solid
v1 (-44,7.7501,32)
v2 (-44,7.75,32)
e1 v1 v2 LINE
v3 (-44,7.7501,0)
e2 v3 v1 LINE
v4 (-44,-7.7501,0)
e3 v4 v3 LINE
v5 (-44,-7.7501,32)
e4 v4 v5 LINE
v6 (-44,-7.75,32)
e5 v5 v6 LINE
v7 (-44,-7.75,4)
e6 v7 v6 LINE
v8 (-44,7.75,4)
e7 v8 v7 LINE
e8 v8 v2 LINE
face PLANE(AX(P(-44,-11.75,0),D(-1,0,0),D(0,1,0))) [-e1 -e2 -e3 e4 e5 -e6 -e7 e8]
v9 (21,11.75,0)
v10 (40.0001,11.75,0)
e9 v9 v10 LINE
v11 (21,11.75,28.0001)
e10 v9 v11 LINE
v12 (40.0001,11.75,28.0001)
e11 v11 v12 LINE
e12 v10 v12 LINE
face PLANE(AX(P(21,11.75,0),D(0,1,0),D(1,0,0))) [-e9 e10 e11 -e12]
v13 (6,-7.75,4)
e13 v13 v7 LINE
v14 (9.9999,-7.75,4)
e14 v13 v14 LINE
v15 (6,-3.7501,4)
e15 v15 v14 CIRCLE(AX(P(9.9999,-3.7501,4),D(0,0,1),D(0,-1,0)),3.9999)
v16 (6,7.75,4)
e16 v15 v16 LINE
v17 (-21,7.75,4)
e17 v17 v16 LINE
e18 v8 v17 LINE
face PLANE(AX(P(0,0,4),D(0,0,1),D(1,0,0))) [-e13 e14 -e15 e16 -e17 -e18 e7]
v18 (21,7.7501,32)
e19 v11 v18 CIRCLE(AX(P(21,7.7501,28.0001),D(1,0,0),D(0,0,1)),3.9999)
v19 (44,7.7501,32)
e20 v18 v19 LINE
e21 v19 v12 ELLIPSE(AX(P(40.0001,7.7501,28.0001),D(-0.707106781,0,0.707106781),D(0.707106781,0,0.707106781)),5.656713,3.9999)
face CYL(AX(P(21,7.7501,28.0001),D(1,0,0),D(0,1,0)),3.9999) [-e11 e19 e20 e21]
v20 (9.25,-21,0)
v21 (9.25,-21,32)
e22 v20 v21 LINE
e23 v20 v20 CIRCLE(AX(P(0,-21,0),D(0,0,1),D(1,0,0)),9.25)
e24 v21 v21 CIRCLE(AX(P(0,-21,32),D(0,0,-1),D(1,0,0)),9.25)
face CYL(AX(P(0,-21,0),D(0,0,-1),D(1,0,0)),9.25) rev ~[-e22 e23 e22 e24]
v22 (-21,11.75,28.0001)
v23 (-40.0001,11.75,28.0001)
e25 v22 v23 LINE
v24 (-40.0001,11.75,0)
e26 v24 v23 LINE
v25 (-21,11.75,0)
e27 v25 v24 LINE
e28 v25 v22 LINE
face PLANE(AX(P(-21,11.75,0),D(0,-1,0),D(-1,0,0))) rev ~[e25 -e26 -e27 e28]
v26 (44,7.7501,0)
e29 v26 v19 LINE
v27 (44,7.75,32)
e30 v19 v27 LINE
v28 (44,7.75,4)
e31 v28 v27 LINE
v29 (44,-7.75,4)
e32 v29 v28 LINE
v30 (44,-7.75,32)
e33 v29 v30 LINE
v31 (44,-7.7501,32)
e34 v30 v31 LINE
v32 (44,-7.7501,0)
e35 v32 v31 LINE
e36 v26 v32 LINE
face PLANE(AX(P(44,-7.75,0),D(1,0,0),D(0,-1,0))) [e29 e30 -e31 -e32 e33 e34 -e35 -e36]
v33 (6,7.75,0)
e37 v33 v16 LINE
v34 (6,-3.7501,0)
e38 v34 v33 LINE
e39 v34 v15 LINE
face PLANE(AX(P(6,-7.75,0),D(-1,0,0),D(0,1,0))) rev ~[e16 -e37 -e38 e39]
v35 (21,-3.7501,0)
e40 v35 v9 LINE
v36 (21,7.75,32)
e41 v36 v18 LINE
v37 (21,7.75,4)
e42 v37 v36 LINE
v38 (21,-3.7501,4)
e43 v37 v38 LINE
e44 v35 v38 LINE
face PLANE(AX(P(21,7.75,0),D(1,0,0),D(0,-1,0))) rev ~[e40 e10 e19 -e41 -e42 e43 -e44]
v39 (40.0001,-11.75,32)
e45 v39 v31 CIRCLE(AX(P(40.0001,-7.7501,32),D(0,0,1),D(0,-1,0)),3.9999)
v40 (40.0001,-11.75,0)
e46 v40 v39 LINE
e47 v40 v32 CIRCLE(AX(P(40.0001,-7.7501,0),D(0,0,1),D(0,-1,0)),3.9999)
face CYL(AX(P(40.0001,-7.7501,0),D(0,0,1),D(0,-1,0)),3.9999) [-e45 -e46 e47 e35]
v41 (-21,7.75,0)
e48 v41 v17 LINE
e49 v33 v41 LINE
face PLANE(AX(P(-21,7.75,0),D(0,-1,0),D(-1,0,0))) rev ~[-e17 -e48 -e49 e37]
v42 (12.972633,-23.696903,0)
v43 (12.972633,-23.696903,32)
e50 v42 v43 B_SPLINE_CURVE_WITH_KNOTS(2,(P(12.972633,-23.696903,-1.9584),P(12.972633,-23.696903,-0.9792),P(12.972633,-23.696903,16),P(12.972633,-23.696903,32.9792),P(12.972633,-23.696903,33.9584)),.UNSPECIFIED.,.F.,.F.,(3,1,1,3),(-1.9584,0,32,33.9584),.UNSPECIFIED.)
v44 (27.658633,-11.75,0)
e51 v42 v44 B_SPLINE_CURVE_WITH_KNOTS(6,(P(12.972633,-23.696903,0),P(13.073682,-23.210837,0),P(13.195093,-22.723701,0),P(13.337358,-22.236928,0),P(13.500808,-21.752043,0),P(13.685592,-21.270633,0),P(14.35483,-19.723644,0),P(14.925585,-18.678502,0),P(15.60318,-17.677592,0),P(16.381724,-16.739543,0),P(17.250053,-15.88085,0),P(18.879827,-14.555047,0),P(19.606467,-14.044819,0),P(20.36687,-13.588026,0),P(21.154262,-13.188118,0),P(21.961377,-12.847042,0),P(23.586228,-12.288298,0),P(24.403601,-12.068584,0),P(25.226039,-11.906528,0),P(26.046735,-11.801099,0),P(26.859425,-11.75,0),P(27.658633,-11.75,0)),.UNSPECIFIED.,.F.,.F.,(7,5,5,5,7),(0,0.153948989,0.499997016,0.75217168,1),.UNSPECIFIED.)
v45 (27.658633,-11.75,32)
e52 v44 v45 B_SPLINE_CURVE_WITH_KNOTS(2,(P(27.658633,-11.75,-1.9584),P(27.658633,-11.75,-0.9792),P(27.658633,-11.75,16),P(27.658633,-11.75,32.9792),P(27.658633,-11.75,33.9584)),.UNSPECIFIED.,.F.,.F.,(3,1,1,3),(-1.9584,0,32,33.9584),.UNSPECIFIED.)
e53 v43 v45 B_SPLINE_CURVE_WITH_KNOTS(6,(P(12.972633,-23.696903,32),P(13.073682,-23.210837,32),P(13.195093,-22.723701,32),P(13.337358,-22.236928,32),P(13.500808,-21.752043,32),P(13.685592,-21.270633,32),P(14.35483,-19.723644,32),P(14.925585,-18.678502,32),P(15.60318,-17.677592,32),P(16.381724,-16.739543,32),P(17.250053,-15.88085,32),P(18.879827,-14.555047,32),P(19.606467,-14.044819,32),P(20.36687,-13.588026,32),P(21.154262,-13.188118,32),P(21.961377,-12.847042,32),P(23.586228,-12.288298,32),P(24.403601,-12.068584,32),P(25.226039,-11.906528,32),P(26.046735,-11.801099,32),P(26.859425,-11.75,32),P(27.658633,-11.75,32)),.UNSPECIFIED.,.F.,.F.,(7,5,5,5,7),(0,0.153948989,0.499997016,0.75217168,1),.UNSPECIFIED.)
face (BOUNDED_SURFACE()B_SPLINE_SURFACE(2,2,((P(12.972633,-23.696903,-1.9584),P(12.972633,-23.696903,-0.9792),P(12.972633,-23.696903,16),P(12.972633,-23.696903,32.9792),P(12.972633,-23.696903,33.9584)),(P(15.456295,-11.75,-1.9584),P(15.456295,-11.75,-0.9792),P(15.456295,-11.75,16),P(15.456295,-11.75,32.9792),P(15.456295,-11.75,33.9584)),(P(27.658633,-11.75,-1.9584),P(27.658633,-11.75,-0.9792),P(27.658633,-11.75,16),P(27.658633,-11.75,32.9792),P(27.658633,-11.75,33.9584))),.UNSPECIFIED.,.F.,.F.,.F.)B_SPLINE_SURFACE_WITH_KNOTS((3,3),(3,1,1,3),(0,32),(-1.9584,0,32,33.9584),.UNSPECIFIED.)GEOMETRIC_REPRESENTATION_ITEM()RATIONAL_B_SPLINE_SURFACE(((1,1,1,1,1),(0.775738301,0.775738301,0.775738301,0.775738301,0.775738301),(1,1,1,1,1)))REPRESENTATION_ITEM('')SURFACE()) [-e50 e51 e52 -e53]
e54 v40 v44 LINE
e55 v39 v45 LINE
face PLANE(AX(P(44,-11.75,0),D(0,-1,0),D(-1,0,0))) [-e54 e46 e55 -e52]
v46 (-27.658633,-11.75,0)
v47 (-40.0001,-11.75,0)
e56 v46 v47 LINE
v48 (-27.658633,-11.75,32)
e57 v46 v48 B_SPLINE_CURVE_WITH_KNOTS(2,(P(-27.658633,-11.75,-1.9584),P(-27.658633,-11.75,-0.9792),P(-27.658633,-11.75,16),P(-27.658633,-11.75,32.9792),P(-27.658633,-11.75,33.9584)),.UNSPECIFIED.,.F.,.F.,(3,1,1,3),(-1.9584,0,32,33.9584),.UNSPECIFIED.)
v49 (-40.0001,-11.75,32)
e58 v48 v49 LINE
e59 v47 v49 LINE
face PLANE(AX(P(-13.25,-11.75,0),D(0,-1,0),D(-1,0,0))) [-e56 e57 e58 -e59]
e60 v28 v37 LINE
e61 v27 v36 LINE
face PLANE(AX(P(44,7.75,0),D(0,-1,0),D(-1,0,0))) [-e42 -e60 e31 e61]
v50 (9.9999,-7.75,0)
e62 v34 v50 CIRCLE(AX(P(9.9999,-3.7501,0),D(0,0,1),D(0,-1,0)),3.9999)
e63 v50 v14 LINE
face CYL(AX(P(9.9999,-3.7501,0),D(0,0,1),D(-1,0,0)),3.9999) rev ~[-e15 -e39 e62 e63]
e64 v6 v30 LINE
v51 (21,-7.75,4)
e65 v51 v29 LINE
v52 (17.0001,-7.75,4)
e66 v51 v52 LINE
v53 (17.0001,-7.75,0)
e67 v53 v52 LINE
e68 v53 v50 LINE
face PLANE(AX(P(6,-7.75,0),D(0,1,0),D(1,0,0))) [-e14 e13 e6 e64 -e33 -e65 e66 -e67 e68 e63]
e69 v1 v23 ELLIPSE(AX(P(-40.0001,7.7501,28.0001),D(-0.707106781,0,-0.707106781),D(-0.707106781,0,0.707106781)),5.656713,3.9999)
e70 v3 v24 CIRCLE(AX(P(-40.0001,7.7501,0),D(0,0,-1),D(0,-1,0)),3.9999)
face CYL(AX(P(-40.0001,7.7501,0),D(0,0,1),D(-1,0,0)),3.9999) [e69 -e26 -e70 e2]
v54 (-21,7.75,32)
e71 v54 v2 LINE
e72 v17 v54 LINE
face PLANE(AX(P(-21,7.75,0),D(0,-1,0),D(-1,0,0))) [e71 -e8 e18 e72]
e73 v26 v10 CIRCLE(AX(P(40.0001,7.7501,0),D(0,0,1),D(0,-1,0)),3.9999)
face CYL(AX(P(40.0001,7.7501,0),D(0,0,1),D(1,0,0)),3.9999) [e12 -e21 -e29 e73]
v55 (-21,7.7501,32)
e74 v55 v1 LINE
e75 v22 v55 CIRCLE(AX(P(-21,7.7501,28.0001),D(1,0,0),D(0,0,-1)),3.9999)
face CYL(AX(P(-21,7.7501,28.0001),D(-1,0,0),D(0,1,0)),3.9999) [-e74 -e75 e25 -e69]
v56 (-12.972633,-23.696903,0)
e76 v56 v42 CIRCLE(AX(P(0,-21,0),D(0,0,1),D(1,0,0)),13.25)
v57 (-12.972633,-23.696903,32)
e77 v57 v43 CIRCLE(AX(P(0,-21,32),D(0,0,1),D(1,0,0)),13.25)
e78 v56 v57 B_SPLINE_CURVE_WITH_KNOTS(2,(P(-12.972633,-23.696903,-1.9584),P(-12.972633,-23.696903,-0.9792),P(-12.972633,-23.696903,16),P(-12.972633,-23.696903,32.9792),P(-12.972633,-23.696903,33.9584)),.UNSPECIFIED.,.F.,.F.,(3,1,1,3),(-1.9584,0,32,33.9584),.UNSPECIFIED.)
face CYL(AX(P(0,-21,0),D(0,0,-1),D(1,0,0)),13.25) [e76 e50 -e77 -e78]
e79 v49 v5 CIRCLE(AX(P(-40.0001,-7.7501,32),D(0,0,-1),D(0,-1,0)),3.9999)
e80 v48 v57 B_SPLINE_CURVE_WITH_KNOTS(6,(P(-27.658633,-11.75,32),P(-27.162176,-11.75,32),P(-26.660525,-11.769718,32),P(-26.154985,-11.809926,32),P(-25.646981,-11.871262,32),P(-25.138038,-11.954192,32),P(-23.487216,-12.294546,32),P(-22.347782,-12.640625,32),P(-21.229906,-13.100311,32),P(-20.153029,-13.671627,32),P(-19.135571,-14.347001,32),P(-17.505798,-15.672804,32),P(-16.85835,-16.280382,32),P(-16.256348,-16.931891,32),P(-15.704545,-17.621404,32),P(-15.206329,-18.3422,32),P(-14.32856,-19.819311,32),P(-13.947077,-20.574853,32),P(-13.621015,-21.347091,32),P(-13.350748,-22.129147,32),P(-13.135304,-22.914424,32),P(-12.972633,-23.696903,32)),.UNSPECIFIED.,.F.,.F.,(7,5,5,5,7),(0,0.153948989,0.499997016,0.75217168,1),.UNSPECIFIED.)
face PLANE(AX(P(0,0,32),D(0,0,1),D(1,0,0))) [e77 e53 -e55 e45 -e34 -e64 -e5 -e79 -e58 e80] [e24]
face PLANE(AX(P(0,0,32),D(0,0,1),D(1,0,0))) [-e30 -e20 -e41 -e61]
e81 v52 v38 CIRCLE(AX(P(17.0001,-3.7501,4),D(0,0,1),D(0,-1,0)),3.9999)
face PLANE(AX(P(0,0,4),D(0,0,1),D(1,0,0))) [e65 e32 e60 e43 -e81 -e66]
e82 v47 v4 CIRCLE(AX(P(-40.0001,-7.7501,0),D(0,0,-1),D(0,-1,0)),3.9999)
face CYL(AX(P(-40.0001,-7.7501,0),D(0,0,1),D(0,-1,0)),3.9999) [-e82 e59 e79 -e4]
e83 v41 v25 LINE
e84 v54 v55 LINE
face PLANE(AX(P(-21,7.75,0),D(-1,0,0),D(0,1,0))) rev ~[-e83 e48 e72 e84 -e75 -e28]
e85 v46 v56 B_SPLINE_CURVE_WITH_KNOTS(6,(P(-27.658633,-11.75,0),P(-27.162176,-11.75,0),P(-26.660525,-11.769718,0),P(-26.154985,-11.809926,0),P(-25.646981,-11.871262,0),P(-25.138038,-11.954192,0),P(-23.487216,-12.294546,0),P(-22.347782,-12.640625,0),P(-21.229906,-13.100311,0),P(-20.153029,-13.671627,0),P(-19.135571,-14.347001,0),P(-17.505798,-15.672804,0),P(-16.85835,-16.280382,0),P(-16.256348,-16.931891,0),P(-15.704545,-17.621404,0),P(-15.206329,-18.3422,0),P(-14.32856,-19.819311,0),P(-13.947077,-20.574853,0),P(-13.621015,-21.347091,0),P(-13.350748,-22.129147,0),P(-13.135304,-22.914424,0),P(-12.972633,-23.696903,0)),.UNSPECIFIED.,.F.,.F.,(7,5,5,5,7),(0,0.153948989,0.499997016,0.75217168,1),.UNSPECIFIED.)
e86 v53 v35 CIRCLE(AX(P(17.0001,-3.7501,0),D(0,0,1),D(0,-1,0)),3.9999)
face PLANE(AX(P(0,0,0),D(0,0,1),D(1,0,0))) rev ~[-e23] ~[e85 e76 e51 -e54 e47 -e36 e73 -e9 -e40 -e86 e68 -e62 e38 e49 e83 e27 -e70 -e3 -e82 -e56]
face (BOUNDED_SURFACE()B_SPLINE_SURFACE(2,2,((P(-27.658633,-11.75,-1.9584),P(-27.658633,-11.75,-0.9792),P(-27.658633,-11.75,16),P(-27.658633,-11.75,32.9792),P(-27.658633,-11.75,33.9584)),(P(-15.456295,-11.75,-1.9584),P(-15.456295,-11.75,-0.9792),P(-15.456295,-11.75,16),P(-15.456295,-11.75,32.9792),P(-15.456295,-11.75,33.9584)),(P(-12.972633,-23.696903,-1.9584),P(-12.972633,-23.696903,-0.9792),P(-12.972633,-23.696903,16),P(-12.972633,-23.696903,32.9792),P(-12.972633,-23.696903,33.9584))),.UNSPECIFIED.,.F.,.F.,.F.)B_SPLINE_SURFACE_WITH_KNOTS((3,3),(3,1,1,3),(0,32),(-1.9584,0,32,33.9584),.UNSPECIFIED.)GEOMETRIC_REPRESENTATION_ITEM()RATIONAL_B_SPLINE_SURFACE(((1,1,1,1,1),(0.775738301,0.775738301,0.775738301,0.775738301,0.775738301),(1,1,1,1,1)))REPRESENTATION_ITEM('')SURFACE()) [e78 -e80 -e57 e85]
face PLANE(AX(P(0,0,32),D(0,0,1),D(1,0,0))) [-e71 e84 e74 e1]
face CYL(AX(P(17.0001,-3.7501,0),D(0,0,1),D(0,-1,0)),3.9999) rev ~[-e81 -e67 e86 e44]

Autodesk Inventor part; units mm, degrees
ref_plane "YZ Plane" through (0, 0, 0) normal (1, 0, 0) x (0, 1, 0)
ref_plane "XZ Plane" through (0, 0, 0) normal (0, 1, 0) x (-1, 0, 0)
ref_plane "XY Plane" through (0, 0, 0) normal (0, 0, 1) x (1, 0, 0)
sketch "Sketch1" plane through (0, 0, 0) normal (0, 0, 1) x (1, 0, 0)
  line L0 (-44, -7.75) -> (44, -7.75)
  line L1 (44, -7.75) -> (44, 7.75)
  line L2 (44, 7.75) -> (-44, 7.75)
  line L3 (-44, 7.75) -> (-44, -7.75)
  line L4 (-44, -7.75) -> (44, 7.75) construction
  line L5 (44, -7.75) -> (-44, 7.75) construction
  line L6 (-44, -7.75) -> (44, -7.75)
  line L7 (44, -7.75) -> (44, -11.75)
  line L8 (44, -11.75) -> (-44, -11.75)
  line L9 (-44, -11.75) -> (-44, -7.75)
  line L10 (-44, 7.75) -> (-21, 7.75)
  line L11 (-21, 7.75) -> (-21, 11.75)
  line L12 (-21, 11.75) -> (-44, 11.75)
  line L13 (-44, 11.75) -> (-44, 7.75)
  line L14 (44, 7.75) -> (21, 7.75)
  line L15 (21, 7.75) -> (21, 11.75)
  line L16 (21, 11.75) -> (44, 11.75)
  line L17 (44, 11.75) -> (44, 7.75)
  line L18 (0, 0) -> (0, -41.0889) construction
  circle A0 centre (0, -21) radius 9.25
  circle A1 centre (0, -21) radius 13.25
  line L19 (-13.25, -21) -> (-13.25, -11.75)
  line L20 (-13.25, -11.75) -> (-9.4868, -11.75)
  line L21 (13.25, -11.75) -> (9.4868, -11.75)
  line L22 (13.25, -21) -> (13.25, -11.75)
  line L23 (13.25, -11.75) -> (9.4868, -11.75)
  line L24 (0, 0) -> (65.293, 0) construction
  line L25 (21, -7.75) -> (6, -7.75)
  line L26 (6, -7.75) -> (6, 7.75)
  line L27 (6, 7.75) -> (21, 7.75)
  line L28 (21, 7.75) -> (21, -7.75)
  line L29 (21, -7.75) -> (6, 7.75) construction
  line L30 (6, -7.75) -> (21, 7.75) construction
  point P0 (13.25, -21)
  point P1 (13.5, 0)
  dimension "d0" = 88
  dimension "d1" = 15.5
  dimension "d2" = 4
  dimension "d3" = 4
  dimension "d4" = 23
  dimension "d5" = 23
  dimension "d6" = 18.5
  dimension "d7" = 26.5
  dimension "d8" = 90
  dimension "d19" = 15
  dimension "d20" = 15.5
  dimension "d21" = 23
extrude "main" add sketch "Sketch1" along normal blind 32 contours L0 L7 L8 A1 | A1 L8 L9 L0 | A1 L8 | L15 L16 L17 L2 | A1 L8 | L8 L22 A1 | A1 L19 L8 | L2 L13 L12 L11
extrude "bottom" add sketch "Sketch1" along normal blind 4 contours L0 L3 L2 L26 | L28 L2 L1 L0
fillet "Fillet1" radius 15 2 edges at (13.25, -11.75, 16) (-13.25, -11.75, 16)
fillet "Fillet2" radius 4 8 edges at (-44, 11.75, 16) (-44, -11.75, 16) (44, 11.75, 16) (44, -11.75, 16) (32.5, 11.75, 32) (-32.5, 11.75, 32) (21, -7.75, 2) (6, -7.75, 2)
equation "\"d2\" = wall"
equation "\"d3\" = wall2"
equation "\"d4\" = d5"
equation "\"d5\" = d21"
equation "\"d7\" = d6 + 2 * wall"
equation "\"d20\" = d1"
equation "\"d15\" = wall"
equation "\"d14\" = wall"
equation "\"wall\" = 4"
equation "\"wall2\" = 4"
properties part number "camera_holder"
